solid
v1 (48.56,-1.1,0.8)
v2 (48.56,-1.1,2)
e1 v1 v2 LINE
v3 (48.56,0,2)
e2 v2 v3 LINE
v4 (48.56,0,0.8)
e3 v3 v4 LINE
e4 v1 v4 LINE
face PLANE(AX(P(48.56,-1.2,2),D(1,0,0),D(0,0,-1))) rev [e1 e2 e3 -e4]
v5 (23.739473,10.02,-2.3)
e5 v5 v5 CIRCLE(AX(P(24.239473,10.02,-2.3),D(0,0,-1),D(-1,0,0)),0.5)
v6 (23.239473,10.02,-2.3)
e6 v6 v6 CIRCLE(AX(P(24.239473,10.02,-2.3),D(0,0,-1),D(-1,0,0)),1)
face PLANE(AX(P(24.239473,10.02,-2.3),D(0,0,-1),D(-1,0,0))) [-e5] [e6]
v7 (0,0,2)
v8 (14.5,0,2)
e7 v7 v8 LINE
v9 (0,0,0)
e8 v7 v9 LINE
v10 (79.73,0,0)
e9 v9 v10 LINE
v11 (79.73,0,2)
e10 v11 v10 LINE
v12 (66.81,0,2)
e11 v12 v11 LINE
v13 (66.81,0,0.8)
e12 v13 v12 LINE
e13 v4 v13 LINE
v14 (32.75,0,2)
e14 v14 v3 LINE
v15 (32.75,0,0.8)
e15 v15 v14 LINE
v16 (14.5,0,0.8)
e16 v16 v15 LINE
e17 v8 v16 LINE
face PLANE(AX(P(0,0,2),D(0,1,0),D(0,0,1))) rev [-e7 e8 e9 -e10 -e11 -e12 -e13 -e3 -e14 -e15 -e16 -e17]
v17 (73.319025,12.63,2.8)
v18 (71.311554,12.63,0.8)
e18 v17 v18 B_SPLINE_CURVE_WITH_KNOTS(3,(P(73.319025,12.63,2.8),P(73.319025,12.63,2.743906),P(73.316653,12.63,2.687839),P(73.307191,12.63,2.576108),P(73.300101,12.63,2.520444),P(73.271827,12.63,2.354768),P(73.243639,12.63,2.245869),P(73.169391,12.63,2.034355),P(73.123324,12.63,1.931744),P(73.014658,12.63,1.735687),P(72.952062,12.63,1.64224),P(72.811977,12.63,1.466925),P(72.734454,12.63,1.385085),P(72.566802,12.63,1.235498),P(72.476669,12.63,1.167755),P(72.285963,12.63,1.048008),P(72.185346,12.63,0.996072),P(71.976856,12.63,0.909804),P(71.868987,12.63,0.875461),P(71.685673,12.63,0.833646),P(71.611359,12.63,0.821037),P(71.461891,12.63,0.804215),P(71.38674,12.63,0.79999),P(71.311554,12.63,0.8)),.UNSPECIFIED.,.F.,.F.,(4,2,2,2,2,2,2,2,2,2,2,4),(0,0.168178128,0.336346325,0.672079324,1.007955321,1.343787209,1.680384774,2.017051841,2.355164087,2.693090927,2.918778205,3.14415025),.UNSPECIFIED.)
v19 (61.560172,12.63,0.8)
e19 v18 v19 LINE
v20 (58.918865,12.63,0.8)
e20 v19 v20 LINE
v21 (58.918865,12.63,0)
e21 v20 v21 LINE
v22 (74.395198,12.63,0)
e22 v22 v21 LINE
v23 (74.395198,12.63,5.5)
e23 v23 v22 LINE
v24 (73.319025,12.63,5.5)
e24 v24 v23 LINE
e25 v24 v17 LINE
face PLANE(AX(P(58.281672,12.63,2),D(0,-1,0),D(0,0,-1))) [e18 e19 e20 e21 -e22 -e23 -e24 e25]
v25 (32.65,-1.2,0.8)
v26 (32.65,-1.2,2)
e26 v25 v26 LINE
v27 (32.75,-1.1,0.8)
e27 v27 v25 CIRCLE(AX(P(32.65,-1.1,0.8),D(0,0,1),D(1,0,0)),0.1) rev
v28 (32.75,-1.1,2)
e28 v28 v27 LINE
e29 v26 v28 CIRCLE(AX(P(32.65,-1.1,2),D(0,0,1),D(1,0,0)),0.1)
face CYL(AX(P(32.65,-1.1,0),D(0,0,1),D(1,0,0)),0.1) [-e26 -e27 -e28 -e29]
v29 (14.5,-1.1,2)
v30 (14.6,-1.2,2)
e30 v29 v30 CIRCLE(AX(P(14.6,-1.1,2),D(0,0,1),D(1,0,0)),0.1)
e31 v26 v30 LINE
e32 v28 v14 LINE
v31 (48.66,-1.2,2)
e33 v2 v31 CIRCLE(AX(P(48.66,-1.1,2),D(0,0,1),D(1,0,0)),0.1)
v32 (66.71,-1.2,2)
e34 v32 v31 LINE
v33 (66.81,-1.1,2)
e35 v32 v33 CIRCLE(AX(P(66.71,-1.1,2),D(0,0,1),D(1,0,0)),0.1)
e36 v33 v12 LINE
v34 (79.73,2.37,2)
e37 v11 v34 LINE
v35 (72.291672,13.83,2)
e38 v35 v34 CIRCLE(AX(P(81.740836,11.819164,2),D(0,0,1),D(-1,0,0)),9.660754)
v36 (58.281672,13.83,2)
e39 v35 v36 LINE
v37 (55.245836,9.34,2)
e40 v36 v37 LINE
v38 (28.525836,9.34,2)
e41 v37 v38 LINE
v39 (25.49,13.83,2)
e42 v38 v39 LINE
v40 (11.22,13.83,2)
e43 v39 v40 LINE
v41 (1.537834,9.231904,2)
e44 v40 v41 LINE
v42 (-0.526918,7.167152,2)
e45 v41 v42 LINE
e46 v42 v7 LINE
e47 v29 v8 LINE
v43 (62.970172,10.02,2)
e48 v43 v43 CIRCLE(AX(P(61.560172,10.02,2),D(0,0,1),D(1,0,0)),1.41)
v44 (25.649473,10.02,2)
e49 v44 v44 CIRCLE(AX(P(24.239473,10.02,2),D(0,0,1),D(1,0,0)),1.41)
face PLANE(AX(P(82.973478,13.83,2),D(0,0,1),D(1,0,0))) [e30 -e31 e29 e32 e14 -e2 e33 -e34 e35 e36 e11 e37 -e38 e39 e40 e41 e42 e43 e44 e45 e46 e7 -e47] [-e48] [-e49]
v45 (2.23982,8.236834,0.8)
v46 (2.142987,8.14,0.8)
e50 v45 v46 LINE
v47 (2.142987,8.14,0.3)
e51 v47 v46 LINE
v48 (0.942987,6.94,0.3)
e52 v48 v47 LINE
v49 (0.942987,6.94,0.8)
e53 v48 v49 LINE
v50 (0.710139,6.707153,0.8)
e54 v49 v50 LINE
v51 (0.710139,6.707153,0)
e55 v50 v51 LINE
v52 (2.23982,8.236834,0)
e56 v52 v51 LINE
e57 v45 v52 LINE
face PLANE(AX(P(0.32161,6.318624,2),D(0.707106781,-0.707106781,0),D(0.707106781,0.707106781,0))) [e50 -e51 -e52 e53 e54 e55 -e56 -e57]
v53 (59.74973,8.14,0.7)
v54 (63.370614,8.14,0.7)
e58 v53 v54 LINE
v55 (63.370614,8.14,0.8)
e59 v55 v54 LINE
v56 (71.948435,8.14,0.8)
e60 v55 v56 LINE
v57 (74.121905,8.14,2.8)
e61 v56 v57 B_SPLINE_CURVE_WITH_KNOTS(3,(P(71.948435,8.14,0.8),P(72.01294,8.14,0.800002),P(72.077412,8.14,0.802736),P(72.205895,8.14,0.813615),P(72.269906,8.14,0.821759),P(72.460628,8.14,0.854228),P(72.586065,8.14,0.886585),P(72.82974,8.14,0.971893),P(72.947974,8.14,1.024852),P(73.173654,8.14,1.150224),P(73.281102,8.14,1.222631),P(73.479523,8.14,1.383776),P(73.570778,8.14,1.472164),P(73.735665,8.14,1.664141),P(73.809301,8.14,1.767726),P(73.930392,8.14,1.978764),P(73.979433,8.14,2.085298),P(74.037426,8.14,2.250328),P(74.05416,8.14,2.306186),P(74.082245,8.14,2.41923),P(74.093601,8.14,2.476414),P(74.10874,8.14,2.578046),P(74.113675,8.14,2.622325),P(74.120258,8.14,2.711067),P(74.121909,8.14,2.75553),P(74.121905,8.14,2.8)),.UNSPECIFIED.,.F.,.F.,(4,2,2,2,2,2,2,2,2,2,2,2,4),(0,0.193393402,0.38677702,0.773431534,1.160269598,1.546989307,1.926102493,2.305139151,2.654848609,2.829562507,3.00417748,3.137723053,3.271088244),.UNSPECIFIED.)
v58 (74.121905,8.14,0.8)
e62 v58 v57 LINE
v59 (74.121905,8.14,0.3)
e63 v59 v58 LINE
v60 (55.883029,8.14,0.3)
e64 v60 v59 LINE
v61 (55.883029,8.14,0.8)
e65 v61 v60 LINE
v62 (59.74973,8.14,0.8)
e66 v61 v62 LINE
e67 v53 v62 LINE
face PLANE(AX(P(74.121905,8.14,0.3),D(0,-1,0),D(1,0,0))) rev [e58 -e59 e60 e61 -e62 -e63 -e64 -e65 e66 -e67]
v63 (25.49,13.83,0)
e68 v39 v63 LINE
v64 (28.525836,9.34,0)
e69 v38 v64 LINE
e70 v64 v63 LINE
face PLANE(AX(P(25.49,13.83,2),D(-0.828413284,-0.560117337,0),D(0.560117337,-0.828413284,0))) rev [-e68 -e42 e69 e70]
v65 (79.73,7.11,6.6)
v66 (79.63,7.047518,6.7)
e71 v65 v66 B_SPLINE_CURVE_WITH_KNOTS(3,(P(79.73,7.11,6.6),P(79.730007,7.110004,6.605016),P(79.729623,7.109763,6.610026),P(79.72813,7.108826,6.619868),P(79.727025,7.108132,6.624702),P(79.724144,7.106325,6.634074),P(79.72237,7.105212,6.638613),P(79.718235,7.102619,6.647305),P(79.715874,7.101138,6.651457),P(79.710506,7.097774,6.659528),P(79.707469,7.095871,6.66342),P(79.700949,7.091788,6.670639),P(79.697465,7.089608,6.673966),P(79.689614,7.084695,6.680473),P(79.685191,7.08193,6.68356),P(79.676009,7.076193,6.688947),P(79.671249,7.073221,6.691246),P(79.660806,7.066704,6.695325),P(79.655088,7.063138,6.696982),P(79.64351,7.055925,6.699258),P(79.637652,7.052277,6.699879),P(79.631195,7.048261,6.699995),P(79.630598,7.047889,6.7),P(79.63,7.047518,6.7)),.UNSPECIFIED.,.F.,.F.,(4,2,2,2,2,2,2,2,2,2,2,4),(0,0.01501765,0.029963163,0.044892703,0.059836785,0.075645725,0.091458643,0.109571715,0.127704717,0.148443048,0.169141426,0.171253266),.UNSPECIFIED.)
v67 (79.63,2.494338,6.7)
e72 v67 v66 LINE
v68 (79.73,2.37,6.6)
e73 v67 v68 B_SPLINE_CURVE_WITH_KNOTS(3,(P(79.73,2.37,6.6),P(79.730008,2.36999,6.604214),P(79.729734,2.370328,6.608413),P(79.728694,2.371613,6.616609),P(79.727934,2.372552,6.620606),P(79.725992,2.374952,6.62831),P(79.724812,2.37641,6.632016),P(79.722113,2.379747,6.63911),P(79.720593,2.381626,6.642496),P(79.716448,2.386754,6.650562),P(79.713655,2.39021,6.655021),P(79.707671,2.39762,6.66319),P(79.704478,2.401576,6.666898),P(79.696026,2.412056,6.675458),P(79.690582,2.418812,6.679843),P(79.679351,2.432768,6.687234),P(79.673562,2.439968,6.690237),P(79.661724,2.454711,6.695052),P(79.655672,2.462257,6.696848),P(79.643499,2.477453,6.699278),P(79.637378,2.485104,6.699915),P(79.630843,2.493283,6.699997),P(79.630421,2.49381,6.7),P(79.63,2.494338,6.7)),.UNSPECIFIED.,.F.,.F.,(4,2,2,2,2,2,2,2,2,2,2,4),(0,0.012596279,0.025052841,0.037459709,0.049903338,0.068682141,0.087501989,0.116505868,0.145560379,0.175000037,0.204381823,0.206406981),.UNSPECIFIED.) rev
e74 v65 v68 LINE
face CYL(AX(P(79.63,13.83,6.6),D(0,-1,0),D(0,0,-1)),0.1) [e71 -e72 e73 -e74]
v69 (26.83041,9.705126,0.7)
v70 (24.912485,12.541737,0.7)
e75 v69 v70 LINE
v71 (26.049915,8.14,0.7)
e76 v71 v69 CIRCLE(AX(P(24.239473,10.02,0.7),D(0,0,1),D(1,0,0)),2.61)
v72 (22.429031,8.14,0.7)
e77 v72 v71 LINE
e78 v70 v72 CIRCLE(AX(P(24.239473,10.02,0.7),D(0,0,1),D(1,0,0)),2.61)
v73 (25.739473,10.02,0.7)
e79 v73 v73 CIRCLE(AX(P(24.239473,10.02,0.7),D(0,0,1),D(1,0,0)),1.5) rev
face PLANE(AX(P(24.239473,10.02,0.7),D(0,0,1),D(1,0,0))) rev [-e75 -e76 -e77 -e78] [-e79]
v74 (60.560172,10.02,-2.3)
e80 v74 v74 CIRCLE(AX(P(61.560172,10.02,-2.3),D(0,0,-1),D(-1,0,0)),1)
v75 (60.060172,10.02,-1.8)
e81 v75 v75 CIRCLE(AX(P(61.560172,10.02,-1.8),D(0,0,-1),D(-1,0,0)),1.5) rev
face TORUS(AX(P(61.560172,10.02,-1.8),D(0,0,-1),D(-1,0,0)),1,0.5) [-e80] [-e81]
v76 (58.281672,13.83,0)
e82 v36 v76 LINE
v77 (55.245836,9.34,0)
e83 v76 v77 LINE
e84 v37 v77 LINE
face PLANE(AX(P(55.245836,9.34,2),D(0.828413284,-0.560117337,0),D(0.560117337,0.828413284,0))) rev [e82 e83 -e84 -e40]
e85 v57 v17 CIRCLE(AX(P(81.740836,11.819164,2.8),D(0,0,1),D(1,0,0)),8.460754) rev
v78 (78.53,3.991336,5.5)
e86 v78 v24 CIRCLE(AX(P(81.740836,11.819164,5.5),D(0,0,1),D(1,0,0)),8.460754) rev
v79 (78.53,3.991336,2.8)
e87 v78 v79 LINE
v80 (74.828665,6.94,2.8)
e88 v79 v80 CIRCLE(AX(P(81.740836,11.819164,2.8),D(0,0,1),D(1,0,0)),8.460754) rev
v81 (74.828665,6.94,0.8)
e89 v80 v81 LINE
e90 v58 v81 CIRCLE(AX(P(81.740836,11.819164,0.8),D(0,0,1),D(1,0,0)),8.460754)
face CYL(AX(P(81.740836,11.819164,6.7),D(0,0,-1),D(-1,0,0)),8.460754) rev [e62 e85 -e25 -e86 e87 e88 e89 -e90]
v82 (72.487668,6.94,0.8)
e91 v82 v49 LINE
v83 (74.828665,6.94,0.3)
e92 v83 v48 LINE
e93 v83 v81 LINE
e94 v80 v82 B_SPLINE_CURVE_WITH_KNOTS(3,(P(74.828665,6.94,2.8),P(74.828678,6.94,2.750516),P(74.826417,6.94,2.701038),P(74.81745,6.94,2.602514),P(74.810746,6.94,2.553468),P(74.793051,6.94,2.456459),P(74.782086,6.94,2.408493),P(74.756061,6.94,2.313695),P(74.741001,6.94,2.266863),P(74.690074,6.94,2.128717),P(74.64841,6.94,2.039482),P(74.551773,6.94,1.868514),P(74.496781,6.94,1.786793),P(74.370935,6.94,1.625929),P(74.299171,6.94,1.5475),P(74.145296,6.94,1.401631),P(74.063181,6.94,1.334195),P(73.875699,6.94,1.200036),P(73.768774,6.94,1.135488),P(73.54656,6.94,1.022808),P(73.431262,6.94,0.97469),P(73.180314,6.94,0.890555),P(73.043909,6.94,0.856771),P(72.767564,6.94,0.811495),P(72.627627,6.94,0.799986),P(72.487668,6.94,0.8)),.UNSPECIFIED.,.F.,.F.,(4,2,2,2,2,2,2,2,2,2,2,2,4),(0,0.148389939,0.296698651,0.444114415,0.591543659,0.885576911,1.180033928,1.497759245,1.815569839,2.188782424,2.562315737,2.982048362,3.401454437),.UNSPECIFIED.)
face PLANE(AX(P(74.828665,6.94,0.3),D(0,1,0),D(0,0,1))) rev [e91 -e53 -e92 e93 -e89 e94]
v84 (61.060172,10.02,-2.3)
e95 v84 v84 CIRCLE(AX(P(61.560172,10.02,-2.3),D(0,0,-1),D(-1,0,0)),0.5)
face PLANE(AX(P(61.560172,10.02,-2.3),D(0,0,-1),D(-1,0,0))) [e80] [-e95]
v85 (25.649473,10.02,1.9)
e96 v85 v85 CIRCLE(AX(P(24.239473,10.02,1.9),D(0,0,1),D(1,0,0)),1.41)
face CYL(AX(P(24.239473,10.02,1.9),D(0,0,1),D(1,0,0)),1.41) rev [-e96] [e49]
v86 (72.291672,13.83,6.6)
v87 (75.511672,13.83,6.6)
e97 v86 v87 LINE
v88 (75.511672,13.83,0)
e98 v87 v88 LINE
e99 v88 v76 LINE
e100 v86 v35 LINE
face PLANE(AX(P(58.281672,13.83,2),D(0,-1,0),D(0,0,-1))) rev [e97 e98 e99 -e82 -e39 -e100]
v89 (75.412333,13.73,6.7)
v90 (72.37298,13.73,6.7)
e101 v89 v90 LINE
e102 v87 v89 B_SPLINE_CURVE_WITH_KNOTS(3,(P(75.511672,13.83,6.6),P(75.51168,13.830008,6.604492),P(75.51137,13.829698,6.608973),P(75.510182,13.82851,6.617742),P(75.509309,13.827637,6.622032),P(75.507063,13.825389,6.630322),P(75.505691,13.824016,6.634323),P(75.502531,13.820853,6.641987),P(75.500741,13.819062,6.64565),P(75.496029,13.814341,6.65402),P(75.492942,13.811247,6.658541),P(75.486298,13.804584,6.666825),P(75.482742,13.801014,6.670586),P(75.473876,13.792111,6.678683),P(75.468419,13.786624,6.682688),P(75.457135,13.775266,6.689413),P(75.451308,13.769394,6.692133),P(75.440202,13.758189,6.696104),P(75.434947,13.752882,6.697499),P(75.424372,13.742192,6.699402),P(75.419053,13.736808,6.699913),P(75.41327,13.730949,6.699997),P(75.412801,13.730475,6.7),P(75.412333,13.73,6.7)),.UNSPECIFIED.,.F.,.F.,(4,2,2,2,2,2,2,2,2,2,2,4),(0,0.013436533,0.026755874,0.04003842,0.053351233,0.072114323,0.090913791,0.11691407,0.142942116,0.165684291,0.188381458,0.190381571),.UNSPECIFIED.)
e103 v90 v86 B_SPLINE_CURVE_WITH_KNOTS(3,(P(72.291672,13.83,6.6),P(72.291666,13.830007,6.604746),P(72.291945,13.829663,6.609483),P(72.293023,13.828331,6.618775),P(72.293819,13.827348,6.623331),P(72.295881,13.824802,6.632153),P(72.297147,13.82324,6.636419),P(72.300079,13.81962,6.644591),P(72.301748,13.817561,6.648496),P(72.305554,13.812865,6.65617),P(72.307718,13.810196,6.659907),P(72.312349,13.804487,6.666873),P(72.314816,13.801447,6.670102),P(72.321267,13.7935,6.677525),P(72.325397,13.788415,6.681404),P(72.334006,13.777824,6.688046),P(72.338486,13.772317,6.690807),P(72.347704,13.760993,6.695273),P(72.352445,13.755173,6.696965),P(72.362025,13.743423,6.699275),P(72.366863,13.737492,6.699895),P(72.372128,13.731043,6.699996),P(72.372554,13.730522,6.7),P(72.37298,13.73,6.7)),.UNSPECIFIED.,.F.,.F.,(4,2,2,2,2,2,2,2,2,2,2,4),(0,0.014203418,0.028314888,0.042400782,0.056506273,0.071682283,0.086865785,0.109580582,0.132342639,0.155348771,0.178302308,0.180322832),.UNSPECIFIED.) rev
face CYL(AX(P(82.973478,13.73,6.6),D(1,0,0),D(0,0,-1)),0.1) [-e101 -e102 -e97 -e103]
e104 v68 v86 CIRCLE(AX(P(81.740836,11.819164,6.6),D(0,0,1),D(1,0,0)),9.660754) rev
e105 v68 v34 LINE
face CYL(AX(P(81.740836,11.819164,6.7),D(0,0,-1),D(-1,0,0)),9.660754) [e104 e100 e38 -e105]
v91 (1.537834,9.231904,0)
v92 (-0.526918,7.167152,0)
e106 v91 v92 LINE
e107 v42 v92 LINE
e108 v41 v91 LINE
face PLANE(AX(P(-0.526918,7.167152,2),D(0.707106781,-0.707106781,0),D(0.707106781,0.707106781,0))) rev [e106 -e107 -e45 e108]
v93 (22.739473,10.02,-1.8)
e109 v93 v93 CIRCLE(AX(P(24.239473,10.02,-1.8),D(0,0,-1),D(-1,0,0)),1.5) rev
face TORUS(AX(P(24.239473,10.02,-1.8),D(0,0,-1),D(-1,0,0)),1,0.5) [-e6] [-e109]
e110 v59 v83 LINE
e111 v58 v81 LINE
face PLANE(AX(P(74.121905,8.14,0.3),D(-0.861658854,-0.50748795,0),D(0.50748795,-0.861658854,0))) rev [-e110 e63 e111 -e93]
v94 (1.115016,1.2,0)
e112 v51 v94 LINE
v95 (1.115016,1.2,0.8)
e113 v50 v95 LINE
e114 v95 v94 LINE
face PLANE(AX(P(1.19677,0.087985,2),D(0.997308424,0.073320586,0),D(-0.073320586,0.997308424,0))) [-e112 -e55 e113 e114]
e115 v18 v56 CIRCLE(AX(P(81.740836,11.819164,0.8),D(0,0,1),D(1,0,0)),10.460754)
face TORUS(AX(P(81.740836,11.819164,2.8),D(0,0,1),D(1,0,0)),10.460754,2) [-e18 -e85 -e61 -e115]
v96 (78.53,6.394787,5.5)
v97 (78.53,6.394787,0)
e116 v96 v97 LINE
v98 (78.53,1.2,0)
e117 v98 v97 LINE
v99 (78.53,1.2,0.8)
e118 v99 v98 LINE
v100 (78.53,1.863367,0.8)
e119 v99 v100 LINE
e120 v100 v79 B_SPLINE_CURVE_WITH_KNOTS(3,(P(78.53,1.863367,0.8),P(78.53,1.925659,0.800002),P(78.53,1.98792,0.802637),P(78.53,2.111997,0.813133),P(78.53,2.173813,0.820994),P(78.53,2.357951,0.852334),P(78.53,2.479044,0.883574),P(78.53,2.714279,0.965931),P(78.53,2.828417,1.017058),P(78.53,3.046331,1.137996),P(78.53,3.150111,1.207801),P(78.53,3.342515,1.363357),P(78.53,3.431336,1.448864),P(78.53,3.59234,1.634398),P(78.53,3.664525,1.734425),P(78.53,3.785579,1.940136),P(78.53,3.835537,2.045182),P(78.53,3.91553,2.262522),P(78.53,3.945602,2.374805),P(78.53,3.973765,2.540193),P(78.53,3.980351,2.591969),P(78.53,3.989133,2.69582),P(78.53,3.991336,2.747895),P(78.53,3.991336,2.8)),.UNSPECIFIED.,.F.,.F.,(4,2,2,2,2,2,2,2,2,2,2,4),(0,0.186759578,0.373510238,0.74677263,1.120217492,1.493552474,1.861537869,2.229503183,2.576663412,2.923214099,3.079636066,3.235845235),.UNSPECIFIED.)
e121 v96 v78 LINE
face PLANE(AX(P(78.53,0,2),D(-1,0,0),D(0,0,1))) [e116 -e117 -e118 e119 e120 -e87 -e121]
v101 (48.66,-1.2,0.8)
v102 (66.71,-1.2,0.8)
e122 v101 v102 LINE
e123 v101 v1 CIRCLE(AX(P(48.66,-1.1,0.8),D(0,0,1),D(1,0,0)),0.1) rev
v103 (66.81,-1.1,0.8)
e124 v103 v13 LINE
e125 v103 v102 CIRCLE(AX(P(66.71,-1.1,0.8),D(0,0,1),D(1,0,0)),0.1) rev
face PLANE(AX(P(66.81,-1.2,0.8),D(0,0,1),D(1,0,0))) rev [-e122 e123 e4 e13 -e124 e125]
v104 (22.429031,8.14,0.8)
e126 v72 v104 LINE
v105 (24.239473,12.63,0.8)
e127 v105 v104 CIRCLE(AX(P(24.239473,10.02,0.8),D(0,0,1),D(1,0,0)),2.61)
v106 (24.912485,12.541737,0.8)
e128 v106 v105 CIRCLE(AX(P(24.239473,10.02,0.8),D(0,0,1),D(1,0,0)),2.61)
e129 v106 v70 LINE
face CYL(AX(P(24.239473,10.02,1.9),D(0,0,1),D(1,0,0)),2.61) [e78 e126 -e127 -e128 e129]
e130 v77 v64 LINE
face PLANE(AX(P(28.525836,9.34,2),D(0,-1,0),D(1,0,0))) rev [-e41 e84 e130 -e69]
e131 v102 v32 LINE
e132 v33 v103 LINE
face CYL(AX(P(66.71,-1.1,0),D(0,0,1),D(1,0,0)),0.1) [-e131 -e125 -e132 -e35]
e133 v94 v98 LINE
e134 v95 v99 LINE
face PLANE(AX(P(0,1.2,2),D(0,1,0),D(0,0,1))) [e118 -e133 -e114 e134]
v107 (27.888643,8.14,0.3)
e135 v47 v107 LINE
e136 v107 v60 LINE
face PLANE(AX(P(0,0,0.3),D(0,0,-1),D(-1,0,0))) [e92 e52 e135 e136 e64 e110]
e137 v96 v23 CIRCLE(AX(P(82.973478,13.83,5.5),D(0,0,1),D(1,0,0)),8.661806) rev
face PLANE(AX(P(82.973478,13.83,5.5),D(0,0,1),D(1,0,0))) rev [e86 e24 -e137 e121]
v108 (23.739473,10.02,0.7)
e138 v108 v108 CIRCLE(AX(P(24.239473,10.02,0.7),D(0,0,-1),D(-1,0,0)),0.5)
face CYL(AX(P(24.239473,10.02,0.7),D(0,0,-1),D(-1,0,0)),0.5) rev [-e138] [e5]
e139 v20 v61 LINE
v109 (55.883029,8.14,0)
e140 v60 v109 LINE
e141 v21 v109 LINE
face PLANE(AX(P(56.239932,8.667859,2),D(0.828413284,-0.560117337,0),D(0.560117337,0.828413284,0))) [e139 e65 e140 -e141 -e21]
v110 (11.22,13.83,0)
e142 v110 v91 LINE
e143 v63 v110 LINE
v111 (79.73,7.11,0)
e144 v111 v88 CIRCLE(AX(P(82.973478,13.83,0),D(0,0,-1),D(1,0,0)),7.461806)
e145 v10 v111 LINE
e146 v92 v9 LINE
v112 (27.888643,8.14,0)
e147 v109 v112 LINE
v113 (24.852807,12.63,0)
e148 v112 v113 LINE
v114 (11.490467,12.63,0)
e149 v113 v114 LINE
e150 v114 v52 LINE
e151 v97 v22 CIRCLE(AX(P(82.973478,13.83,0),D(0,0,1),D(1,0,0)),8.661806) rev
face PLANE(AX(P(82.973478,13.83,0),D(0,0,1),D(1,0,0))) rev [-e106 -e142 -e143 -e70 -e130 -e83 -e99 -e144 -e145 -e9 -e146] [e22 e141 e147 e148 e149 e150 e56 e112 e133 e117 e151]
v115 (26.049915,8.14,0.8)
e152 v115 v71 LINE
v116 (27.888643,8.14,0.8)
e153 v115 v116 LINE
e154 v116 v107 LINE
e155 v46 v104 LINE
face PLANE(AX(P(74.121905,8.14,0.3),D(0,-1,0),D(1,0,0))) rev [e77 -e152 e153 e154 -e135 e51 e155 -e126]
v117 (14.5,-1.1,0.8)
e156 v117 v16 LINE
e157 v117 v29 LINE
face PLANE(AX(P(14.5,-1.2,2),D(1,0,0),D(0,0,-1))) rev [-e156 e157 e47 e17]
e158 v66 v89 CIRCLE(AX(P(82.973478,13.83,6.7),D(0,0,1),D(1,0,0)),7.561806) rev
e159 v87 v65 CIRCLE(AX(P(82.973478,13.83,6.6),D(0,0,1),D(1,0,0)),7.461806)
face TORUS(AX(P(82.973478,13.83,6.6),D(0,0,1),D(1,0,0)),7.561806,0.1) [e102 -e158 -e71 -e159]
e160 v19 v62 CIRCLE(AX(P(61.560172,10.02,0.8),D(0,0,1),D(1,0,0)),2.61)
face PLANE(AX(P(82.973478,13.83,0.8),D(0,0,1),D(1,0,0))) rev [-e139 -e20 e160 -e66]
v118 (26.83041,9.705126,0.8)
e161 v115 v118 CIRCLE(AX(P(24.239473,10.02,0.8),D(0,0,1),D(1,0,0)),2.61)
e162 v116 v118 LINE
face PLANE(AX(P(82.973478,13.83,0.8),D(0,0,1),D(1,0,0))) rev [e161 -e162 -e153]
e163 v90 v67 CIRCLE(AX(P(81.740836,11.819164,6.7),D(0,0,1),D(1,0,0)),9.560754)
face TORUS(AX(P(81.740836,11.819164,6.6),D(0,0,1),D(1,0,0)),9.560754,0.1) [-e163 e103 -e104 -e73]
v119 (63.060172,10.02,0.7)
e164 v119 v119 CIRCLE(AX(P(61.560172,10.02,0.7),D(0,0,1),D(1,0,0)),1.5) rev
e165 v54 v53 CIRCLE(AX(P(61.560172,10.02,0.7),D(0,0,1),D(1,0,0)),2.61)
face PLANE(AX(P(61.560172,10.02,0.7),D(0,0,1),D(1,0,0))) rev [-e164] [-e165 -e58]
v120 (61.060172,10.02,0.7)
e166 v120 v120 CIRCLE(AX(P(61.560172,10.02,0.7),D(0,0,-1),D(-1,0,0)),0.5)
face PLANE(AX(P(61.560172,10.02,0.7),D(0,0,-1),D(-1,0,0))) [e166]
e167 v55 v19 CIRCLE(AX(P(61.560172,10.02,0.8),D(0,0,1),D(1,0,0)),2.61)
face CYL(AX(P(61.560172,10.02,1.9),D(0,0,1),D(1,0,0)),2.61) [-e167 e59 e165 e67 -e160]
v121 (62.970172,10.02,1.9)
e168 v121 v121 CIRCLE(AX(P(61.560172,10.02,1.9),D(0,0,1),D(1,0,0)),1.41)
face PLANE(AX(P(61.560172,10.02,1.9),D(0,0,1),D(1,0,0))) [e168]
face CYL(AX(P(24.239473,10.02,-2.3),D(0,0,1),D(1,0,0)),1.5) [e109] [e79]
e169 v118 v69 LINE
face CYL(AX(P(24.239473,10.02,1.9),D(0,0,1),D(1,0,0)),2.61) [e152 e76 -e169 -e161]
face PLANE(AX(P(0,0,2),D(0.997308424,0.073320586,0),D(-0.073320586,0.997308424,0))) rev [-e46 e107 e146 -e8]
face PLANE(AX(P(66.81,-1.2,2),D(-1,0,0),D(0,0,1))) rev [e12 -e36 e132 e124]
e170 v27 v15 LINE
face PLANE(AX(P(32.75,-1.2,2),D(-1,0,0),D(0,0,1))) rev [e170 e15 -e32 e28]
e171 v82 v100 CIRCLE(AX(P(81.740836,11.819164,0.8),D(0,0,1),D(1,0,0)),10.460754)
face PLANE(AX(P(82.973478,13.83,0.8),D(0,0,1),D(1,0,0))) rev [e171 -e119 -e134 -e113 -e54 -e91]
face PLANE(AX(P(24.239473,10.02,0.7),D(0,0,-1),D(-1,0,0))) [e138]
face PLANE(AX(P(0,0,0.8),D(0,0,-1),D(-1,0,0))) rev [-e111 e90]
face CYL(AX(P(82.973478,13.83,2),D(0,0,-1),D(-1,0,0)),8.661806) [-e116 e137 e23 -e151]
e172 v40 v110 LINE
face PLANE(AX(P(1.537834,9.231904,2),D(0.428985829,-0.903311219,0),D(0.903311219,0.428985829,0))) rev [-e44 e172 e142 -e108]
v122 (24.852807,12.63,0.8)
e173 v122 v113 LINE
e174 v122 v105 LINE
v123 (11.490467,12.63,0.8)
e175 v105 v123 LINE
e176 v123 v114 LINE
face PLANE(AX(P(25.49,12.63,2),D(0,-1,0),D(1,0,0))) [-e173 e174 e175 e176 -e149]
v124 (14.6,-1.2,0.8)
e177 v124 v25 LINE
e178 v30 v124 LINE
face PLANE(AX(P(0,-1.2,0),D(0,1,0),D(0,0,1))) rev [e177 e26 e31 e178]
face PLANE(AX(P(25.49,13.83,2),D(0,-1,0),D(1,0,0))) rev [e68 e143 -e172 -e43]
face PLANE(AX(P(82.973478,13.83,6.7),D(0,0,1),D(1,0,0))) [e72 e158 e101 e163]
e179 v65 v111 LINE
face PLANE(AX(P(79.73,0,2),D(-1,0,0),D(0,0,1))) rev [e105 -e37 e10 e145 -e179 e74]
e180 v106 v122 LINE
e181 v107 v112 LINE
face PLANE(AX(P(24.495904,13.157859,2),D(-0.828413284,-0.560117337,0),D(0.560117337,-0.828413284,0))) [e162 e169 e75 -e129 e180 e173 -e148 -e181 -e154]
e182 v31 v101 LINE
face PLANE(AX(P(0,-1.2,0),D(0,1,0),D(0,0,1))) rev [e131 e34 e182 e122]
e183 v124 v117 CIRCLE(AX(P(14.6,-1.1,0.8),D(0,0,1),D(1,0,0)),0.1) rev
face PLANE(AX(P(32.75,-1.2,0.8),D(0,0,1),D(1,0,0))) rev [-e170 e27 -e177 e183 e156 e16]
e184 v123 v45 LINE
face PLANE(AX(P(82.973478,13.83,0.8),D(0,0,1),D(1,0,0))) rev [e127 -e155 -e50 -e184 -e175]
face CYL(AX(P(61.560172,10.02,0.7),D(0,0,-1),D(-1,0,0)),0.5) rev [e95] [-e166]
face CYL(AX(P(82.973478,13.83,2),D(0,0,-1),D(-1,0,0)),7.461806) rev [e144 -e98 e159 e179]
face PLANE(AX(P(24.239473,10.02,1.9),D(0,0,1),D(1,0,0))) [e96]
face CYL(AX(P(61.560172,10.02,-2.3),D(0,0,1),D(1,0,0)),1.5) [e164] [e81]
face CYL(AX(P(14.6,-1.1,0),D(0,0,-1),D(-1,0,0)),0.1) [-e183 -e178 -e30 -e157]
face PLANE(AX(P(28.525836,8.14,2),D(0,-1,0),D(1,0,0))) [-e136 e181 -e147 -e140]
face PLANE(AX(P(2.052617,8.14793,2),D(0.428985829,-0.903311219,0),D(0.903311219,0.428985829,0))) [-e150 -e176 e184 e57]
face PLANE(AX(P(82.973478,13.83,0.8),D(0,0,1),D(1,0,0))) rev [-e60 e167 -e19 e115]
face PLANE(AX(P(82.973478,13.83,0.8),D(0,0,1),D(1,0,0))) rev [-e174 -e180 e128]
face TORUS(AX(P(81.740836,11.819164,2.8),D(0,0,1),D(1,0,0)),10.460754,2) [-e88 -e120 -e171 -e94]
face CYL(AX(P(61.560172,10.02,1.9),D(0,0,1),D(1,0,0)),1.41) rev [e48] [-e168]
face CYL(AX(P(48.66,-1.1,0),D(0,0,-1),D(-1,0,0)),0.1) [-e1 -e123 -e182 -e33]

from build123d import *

# Parameters (mm, degrees)
BOSS_EXTRUDE1_DEPTH = 2
SKETCH2_W           = 18.25
SKETCH2_H           = 1.2
BOSS_EXTRUDE2_DEPTH = 1.2
SKETCH3_W           = 18.25
SKETCH3_H           = 1.2
BOSS_EXTRUDE3_DEPTH = 1.2
FILLET1_R           = 0.1
FILLET2_R           = 0.1
FILLET3_R           = 0.1
FILLET4_R           = 0.1
SKETCH4_R           = 1.41
CUT_EXTRUDE1_DEPTH  = 0.1
BOSS_EXTRUDE4_DEPTH = 4.7
FILLET5_R           = 0.1
SHELL1_START        = 0.710139039
SHELL1_DEPTH        = 77.819860961
SHELL1_START_2      = 1.115016449
SHELL1_2_OUTLINE_W  = 4.49
SHELL1_2_OUTLINE_H  = 0.8
SHELL1_2_DEPTH      = 26.773626454
SHELL1_START_3      = 55.883029025
SHELL1_3_OUTLINE_W  = 4.49
SHELL1_3_OUTLINE_H  = 0.8
SHELL1_3_DEPTH      = 22.646970975
SHELL1_START_4      = 0.8
SHELL1_4_DEPTH      = 4.7
SHELL1_5_DEPTH      = 0.8
SHELL1_START_5      = 0.7
SHELL1_6_OUTLINE_R  = 2.61
SHELL1_6_DEPTH      = 0.1
BOSS_EXTRUDE5_DEPTH = 0.5
SKETCH7_R           = 1.5
BOSS_EXTRUDE6_DEPTH = 3
FILLET6_R           = 0.5
SKETCH8_R           = 0.5
CUT_EXTRUDE2_DEPTH  = 3
SKETCH9_R           = 1.5
BOSS_EXTRUDE7_DEPTH = 3
FILLET7_R           = 0.5
SKETCH10_R          = 0.5
CUT_EXTRUDE3_DEPTH  = 3
FILLET10_R          = 2
FILLET11_R          = 2


with BuildPart() as part:
    # Sketch1 → Boss-Extrude1 (new body)
    with BuildSketch(Plane.XY):
        with BuildLine():
            Line((0, 0), (79.73, 0))
            Line((79.73, 0), (79.73, 7.11))
            ThreePointArc((79.73, 7.11), (76.653638062, 9.862863384), (75.511671928, 13.83))
            Line((75.511671928, 13.83), (58.281671928, 13.83))
            Line((58.281671928, 13.83), (55.245835964, 9.34))
            Line((55.245835964, 9.34), (28.525835964, 9.34))
            Line((28.525835964, 9.34), (25.49, 13.83))
            Line((25.49, 13.83), (11.22, 13.83))
            Line((11.22, 13.83), (1.537833793, 9.231903563))
            Line((1.537833793, 9.231903563), (-0.526918008, 7.167151762))
            Line((-0.526918008, 7.167151762), (0, 0))
        make_face()
    extrude(amount=BOSS_EXTRUDE1_DEPTH)

    # Sketch2 → Boss-Extrude2 (add)
    with BuildSketch(Plane.XZ):
        with Locations((23.625, 1.4)):
            Rectangle(SKETCH2_W, SKETCH2_H)
    extrude(amount=BOSS_EXTRUDE2_DEPTH)

    # Sketch3 → Boss-Extrude3 (add)
    with BuildSketch(Plane.XZ):
        with Locations((57.685, 1.4)):
            Rectangle(SKETCH3_W, SKETCH3_H)
    extrude(amount=BOSS_EXTRUDE3_DEPTH)

    # Fillet1
    fillet1_edges = [part.edges().sort_by_distance(p)[0] for p in [
        (66.81, -1.2, 1.4),
    ]]
    fillet(fillet1_edges, radius=FILLET1_R)

    # Fillet2
    fillet2_edges = [part.edges().sort_by_distance(p)[0] for p in [
        (48.56, -1.2, 1.4),
    ]]
    fillet(fillet2_edges, radius=FILLET2_R)

    # Fillet3
    fillet3_edges = [part.edges().sort_by_distance(p)[0] for p in [
        (32.75, -1.2, 1.4),
    ]]
    fillet(fillet3_edges, radius=FILLET3_R)

    # Fillet4
    fillet4_edges = [part.edges().sort_by_distance(p)[0] for p in [
        (14.5, -1.2, 1.4),
    ]]
    fillet(fillet4_edges, radius=FILLET4_R)

    # Sketch4 → Cut-Extrude1 (cut)
    with BuildSketch(Plane.XY.offset(2)):
        with Locations((24.239473279, 10.02)):
            Circle(SKETCH4_R)
        with Locations((61.560171923, 10.02)):
            Circle(SKETCH4_R)
    extrude(amount=-CUT_EXTRUDE1_DEPTH, mode=Mode.SUBTRACT)

    # Sketch5 → Boss-Extrude4 (add)
    with BuildSketch(Plane.XY.offset(2)):
        with BuildLine():
            Line((75.511671928, 13.83), (72.291671928, 13.83))
            ThreePointArc((72.291671928, 13.83), (73.637392252, 6.559471816), (79.73, 2.37))
            Line((79.73, 2.37), (79.73, 7.11))
            ThreePointArc((79.73, 7.11), (76.653638062, 9.862863384), (75.511671928, 13.83))
        make_face()
    extrude(amount=BOSS_EXTRUDE4_DEPTH)

    # Fillet5
    fillet5_edges = [part.edges().sort_by_distance(p)[0] for p in [
        (76.653638062, 9.862863384, 6.7),
        (73.901671928, 13.83, 6.7),
        (73.637392252, 6.559471816, 6.7),
        (79.73, 4.74, 6.7),
    ]]
    fillet(fillet5_edges, radius=FILLET5_R)

    # Shell1: read off the stored shape, not the designer's step
    # Shell1 outline → Shell1 (cut)
    with BuildSketch(Plane.YZ.offset(SHELL1_START)):
        Polygon((8.14, 0.7), (8.14, 0.8), (1.2, 0.8), (1.2, 0), (8.14, 0), align=None)
    extrude(amount=SHELL1_DEPTH, mode=Mode.SUBTRACT)

    # Shell1 2 outline → Shell1 2 (cut)
    with BuildSketch(Plane.YZ.offset(SHELL1_START_2)):
        with Locations((10.385, 0.4)):
            Rectangle(SHELL1_2_OUTLINE_W, SHELL1_2_OUTLINE_H)
    extrude(amount=SHELL1_2_DEPTH, mode=Mode.SUBTRACT)

    # Shell1 3 outline → Shell1 3 (cut)
    with BuildSketch(Plane.YZ.offset(SHELL1_START_3)):
        with Locations((10.385, 0.4)):
            Rectangle(SHELL1_3_OUTLINE_W, SHELL1_3_OUTLINE_H)
    extrude(amount=SHELL1_3_DEPTH, mode=Mode.SUBTRACT)

    # Shell1 4 outline → Shell1 4 (cut)
    with BuildSketch(Plane.XY.offset(SHELL1_START_4)):
        with BuildLine():
            Line((78.53, 3.991336383), (78.53, 6.394787335))
            ThreePointArc((78.53, 6.394787335), (75.75468216, 9.042947573), (74.395198194, 12.63))
            Line((74.395198194, 12.63), (73.31902509, 12.63))
            ThreePointArc((73.31902509, 12.63), (74.496096812, 7.449025827), (78.53, 3.991336383))
        make_face()
    extrude(amount=SHELL1_4_DEPTH, mode=Mode.SUBTRACT)

    # Shell1 5 outline → Shell1 5 (add)
    with BuildSketch(Plane.XY):
        with BuildLine():
            Line((78.53, 6.394787335), (78.53, 7.835498111))
            ThreePointArc((78.53, 7.835498111), (76.601274587, 9.947529982), (75.608795397, 12.63))
            Line((75.608795397, 12.63), (74.395198194, 12.63))
            ThreePointArc((74.395198194, 12.63), (75.75468216, 9.042947573), (78.53, 6.394787335))
        make_face()
        Polygon((0.710139039, 1.2), (1.115016449, 1.2), (0.710139039, 6.707152534), align=None)
        Polygon((55.883029025, 8.14), (58.918864989, 12.63), (57.47031265, 12.63), (55.883029025, 10.282408245), align=None)
        Polygon((0.710139039, 8.14), (0.710139039, 6.707152534), (2.239820192, 8.236833687), (11.490467063, 12.63), (8.693171864, 12.63), (1.537833793, 9.231903563), (1.115016449, 8.809086219), (1.115016449, 8.14), align=None)
        Polygon((24.852806939, 12.63), (27.888642903, 8.14), (27.888642903, 10.282408245), (26.301359278, 12.63), align=None)
    extrude(amount=SHELL1_5_DEPTH)

    # Shell1 6 outline → Shell1 6 (add)
    with BuildSketch(Plane.XY.offset(SHELL1_START_5)):
        with Locations((61.560171923, 10.02)):
            Circle(SHELL1_6_OUTLINE_R)
        with BuildLine():
            ThreePointArc((24.912484692, 12.541736631), (22.077314607, 8.558093751), (26.830410206, 9.705125674))
            Line((26.830410206, 9.705125674), (24.912484692, 12.541736631))
        make_face()
    extrude(amount=SHELL1_6_DEPTH)

    # Sketch6 → Boss-Extrude5 (add)
    with BuildSketch(Plane(origin=(0, 0, 0.8), x_dir=(-1, 0, 0), z_dir=(0, 0, -1))):
        Polygon((-74.121905242, 8.14), (-2.142986505, 8.14), (-0.942986505, 6.94), (-74.828664694, 6.94), align=None)
    extrude(amount=BOSS_EXTRUDE5_DEPTH)

    # Sketch7 → Boss-Extrude6 (add)
    with BuildSketch(Plane(origin=(0, 0, 0.7), x_dir=(-1, 0, 0), z_dir=(0, 0, -1))):
        with Locations(Location((-61.560171923, 10.02, 0), (0, 0, 180))):
            Circle(SKETCH7_R)
    extrude(amount=BOSS_EXTRUDE6_DEPTH)

    # Fillet6
    fillet6_edges = [part.edges().sort_by_distance(p)[0] for p in [
        (60.060171923, 10.02, -2.3),
    ]]
    fillet(fillet6_edges, radius=FILLET6_R)

    # Sketch8 → Cut-Extrude2 (cut)
    with BuildSketch(Plane(origin=(0, 0, -2.3), x_dir=(-1, 0, 0), z_dir=(0, 0, -1))):
        with Locations((-61.560171923, 10.02)):
            Circle(SKETCH8_R)
    extrude(amount=-CUT_EXTRUDE2_DEPTH, mode=Mode.SUBTRACT)

    # Sketch9 → Boss-Extrude7 (add)
    with BuildSketch(Plane(origin=(0, 0, 0.7), x_dir=(-1, 0, 0), z_dir=(0, 0, -1))):
        with Locations(Location((-24.239473279, 10.02, 0), (0, 0, 180))):
            Circle(SKETCH9_R)
    extrude(amount=BOSS_EXTRUDE7_DEPTH)

    # Fillet7
    fillet7_edges = [part.edges().sort_by_distance(p)[0] for p in [
        (22.739473279, 10.02, -2.3),
    ]]
    fillet(fillet7_edges, radius=FILLET7_R)

    # Sketch10 → Cut-Extrude3 (cut)
    with BuildSketch(Plane(origin=(0, 0, -2.3), x_dir=(-1, 0, 0), z_dir=(0, 0, -1))):
        with Locations((-24.239473279, 10.02)):
            Circle(SKETCH10_R)
    extrude(amount=-CUT_EXTRUDE3_DEPTH, mode=Mode.SUBTRACT)

    # Fillet10
    # the kernel refuses this fillet: 2 mm, written as the material it takes off along each edge
    with BuildSketch(Plane(origin=(81.740835966, 11.819164038, 0.8), x_dir=(-0.7731681215232679, 0.634201116255862, 0), z_dir=(0.634201116255862, 0.7731681215232679, 0))) as fillet10_piece_1_section:
        with BuildLine():
            CenterArc((8.460753713 + FILLET10_R, FILLET10_R), FILLET10_R, 180, 90)
            Line((8.460753713, FILLET10_R), (8.460753713, 0))
            Line((8.460753713, 0), (8.460753713 + FILLET10_R, 0))
        make_face()
    fillet10_piece_1 = revolve(axis=Axis((81.740835966, 11.819164038, 0.8), (0, 0, 1)), revolution_arc=98.997926529, mode=Mode.PRIVATE)
    fillet10_piece_1 = split(fillet10_piece_1, bisect_by=Plane(origin=(81.740835966, 12.63, 0.8), z_dir=(0, -1, 0)), keep=Keep.TOP, mode=Mode.PRIVATE)
    fillet10_piece_1 = split(fillet10_piece_1, bisect_by=Plane(origin=(81.740835966, 8.14, 0.8), z_dir=(0, 1, 0)), keep=Keep.TOP, mode=Mode.PRIVATE)
    add(fillet10_piece_1, mode=Mode.SUBTRACT)

    # Fillet11
    # the kernel refuses this fillet: 2 mm, written as the material it takes off along each edge
    with BuildSketch(Plane(origin=(81.740835966, 11.819164038, 0.8), x_dir=(-0.9997199584304023, -0.023664418774073097, 0), z_dir=(-0.023664418774073097, 0.9997199584304023, 0))) as fillet11_piece_1_section:
        with BuildLine():
            CenterArc((8.460753713 + FILLET11_R, FILLET11_R), FILLET11_R, 180, 90)
            Line((8.460753713, FILLET11_R), (8.460753713, 0))
            Line((8.460753713, 0), (8.460753713 + FILLET11_R, 0))
        make_face()
    fillet11_piece_1 = revolve(axis=Axis((81.740835966, 11.819164038, 0.8), (0, 0, 1)), revolution_arc=100.202942333, mode=Mode.PRIVATE)
    fillet11_piece_1 = split(fillet11_piece_1, bisect_by=Plane(origin=(78.53, 11.819164038, 0.8), z_dir=(-1, 0, 0)), keep=Keep.TOP, mode=Mode.PRIVATE)
    fillet11_piece_1 = split(fillet11_piece_1, bisect_by=Plane(origin=(81.740835966, 6.94, 0.8), z_dir=(0, -1, 0)), keep=Keep.TOP, mode=Mode.PRIVATE)
    add(fillet11_piece_1, mode=Mode.SUBTRACT)


solid = part.part
